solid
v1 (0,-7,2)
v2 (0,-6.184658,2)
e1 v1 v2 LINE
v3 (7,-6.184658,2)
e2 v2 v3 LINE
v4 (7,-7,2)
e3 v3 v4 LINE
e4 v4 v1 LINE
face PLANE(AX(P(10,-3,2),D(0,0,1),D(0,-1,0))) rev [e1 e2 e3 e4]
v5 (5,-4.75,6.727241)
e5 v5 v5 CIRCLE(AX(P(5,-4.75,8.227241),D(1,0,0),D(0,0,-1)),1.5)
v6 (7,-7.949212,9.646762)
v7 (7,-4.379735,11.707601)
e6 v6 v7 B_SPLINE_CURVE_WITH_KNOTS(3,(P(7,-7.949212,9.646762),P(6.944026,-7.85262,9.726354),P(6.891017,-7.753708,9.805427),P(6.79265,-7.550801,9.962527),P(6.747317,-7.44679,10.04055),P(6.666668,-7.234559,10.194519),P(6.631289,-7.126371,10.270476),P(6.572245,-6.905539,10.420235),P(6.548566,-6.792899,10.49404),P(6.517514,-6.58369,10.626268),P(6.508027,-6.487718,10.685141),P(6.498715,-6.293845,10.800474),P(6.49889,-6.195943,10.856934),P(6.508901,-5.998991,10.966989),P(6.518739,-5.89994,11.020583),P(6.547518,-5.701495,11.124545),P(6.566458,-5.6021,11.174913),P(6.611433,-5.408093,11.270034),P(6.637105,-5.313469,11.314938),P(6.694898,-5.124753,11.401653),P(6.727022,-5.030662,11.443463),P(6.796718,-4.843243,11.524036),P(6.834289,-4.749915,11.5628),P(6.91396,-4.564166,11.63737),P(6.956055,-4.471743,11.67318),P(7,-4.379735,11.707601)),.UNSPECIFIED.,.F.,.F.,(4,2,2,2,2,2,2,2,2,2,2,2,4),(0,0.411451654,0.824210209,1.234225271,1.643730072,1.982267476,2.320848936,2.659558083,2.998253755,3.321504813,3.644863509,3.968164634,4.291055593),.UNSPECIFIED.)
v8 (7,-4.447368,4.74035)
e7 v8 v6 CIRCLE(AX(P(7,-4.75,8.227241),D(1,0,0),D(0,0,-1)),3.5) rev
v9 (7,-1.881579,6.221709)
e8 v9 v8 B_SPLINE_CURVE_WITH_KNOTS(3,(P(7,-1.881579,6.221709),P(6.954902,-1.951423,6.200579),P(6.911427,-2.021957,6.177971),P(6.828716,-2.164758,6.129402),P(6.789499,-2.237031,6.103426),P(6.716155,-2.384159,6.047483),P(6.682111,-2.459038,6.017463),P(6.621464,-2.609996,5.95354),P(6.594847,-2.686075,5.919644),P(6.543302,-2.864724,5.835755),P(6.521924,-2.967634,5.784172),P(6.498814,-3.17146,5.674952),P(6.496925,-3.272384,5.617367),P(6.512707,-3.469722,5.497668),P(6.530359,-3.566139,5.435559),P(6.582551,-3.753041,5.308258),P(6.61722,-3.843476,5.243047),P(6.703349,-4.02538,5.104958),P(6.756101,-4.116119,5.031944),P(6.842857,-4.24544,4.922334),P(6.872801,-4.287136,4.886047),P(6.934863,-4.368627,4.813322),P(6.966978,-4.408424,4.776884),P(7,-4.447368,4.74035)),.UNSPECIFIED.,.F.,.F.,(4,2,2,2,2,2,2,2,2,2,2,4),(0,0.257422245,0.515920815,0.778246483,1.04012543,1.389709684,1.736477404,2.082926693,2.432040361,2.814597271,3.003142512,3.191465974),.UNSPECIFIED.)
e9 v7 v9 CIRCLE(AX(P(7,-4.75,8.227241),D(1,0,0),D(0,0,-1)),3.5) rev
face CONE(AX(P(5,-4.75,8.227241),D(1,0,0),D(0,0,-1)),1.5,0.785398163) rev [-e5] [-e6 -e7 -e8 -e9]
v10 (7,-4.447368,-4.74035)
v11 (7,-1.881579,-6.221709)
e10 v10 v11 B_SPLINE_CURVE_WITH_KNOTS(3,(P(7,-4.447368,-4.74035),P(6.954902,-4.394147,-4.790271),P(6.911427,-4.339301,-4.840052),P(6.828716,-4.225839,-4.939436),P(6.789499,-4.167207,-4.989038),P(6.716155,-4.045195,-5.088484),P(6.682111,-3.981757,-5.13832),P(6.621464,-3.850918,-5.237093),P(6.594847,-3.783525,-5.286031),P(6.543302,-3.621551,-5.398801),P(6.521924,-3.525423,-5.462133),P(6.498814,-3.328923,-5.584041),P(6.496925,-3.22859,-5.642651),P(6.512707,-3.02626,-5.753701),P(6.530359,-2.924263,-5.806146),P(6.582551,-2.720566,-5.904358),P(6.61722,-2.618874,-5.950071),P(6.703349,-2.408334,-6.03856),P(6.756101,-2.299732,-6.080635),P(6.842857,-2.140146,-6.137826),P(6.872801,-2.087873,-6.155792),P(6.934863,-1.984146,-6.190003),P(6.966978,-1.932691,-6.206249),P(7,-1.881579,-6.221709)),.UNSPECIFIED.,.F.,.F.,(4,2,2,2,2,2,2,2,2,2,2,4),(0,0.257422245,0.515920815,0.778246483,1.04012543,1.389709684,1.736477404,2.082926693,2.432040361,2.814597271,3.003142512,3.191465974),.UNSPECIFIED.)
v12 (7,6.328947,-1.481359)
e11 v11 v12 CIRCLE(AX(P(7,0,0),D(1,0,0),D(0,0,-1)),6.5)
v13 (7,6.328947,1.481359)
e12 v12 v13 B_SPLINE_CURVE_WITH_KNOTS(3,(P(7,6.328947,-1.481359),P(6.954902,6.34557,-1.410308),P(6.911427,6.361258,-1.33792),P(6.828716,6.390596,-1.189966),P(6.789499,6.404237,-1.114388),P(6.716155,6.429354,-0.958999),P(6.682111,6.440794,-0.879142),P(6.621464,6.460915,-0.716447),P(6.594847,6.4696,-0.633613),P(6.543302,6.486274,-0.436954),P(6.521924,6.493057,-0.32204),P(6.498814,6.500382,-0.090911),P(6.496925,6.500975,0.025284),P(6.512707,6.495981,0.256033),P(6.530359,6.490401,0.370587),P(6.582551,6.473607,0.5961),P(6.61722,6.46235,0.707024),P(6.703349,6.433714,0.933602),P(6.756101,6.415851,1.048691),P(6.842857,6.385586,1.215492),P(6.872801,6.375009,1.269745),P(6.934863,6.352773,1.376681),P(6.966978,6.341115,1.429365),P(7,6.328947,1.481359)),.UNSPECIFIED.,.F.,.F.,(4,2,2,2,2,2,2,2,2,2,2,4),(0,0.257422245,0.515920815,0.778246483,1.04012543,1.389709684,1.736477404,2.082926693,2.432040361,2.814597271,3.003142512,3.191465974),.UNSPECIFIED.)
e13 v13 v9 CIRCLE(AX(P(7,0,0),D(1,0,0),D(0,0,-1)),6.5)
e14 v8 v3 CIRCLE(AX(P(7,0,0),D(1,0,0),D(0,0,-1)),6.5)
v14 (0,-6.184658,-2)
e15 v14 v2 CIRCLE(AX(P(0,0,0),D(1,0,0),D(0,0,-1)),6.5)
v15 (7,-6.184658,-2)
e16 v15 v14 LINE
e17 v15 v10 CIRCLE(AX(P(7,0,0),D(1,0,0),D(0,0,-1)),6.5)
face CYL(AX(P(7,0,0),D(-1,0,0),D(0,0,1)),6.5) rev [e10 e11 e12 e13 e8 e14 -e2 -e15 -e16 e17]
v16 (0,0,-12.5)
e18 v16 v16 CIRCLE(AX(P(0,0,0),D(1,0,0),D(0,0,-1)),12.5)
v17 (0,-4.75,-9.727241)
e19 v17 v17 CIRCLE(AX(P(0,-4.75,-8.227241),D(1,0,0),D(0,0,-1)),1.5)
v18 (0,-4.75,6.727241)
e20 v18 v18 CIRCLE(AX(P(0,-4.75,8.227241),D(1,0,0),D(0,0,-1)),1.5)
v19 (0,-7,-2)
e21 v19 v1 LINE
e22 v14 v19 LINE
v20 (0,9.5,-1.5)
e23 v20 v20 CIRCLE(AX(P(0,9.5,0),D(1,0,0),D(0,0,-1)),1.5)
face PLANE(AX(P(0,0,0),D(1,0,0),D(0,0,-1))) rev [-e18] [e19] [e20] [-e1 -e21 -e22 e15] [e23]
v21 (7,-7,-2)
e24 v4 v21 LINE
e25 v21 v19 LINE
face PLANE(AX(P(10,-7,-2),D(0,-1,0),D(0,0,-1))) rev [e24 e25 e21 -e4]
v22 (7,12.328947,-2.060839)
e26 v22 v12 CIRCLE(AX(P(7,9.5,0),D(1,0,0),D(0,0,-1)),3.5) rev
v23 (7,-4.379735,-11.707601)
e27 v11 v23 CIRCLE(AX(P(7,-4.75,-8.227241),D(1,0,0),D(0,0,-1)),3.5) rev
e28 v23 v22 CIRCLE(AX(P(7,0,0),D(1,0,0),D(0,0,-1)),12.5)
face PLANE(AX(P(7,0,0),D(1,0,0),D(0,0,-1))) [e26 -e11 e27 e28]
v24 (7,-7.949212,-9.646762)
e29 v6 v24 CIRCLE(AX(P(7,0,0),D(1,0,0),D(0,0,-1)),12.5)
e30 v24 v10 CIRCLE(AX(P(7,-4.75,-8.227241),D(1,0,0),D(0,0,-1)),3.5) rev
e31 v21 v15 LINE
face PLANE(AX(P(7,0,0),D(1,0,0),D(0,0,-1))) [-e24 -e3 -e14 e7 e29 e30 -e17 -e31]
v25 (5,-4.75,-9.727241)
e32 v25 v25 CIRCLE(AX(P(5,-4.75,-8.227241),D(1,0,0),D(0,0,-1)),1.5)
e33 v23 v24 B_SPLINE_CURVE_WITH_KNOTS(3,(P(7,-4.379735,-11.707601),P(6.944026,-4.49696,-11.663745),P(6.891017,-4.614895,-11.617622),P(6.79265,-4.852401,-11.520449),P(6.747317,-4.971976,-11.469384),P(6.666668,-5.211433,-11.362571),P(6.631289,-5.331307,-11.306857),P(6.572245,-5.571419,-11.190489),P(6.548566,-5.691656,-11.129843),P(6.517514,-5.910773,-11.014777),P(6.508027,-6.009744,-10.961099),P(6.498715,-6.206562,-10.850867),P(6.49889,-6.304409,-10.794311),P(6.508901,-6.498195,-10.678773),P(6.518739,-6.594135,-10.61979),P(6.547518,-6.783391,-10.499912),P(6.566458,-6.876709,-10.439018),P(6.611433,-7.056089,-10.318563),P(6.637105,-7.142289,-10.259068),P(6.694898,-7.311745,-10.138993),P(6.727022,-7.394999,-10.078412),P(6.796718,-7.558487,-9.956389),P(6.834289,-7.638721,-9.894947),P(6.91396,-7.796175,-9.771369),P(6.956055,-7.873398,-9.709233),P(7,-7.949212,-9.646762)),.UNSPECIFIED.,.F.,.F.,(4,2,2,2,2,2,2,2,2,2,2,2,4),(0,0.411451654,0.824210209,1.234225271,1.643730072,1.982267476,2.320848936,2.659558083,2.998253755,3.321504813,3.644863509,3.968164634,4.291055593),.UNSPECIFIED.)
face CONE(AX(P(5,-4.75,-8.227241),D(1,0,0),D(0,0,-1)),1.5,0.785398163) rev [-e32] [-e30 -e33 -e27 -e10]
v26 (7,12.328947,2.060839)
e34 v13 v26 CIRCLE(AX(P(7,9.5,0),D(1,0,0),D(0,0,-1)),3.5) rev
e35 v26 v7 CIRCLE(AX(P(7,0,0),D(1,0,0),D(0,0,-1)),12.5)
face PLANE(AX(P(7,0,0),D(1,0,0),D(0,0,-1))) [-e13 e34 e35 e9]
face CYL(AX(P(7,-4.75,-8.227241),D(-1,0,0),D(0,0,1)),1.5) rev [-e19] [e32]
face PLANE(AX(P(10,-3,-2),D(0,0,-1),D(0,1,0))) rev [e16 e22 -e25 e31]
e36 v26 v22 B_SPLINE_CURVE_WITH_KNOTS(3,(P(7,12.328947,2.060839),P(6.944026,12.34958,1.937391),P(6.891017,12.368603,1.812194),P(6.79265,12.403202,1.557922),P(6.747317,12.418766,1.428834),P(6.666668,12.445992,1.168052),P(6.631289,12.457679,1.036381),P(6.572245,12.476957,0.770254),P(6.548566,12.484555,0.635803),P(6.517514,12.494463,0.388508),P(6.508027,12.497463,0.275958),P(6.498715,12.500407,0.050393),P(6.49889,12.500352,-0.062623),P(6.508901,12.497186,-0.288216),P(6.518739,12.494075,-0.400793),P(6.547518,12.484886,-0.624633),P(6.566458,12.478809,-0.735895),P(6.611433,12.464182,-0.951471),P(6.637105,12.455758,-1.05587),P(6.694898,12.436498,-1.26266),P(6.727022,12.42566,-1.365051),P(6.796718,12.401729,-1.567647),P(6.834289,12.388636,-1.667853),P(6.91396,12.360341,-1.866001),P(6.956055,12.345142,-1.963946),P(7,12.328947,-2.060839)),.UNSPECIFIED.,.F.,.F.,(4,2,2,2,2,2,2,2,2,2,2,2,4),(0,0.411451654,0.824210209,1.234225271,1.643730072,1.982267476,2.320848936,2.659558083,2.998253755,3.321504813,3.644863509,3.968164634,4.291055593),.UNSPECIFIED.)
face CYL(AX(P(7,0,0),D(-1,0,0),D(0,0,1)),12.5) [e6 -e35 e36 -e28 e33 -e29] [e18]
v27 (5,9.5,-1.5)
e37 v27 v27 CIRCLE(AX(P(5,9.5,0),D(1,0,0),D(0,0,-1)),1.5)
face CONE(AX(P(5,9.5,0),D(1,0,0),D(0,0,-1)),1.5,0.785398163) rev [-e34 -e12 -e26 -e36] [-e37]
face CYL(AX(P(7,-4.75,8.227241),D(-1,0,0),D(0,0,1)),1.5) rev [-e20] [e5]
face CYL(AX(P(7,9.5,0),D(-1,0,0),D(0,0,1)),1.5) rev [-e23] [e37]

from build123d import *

# Parameters (mm, degrees)
SKETCH1_R           = 12.5
SKETCH1_R_2         = 6.5
SKETCH1_R_3         = 1.5
BOSS_EXTRUDE1_DEPTH = 7
CHAMFER1_SIZE       = 2
SKETCH2_W           = 4
SKETCH2_H           = 4
CUT_EXTRUDE1_DEPTH  = 10


with BuildPart() as part:
    # Sketch1 → Boss-Extrude1 (new body)
    with BuildSketch(Plane(origin=(0, 0, 0), x_dir=(0, 0, -1), z_dir=(1, 0, 0))):
        Circle(SKETCH1_R)
        Circle(SKETCH1_R_2, mode=Mode.SUBTRACT)
        with Locations((0, 9.5)):
            Circle(SKETCH1_R_3, mode=Mode.SUBTRACT)
        with Locations((-8.227241336, -4.75)):
            Circle(SKETCH1_R_3, mode=Mode.SUBTRACT)
        with Locations((8.227241336, -4.75)):
            Circle(SKETCH1_R_3, mode=Mode.SUBTRACT)
    extrude(amount=BOSS_EXTRUDE1_DEPTH)

    # Chamfer1
    # the kernel refuses this chamfer: 2 mm, written as the material it takes off along each edge
    with BuildSketch(Plane(origin=(7, -4.75, 8.227241336), x_dir=(0, 0, -1), z_dir=(0, -1, 0))) as chamfer1_piece_1:
        Polygon((1.5, -CHAMFER1_SIZE), (1.5 + CHAMFER1_SIZE, 0), (1.5, 0), align=None)
    revolve(axis=Axis((7, -4.75, 8.227241336), (1, 0, 0)), mode=Mode.SUBTRACT)
    with BuildSketch(Plane(origin=(7, -4.75, -8.227241336), x_dir=(0, 0, -1), z_dir=(0, -1, 0))) as chamfer1_piece_2:
        Polygon((1.5, -CHAMFER1_SIZE), (1.5 + CHAMFER1_SIZE, 0), (1.5, 0), align=None)
    revolve(axis=Axis((7, -4.75, -8.227241336), (1, 0, 0)), mode=Mode.SUBTRACT)
    with BuildSketch(Plane(origin=(7, 9.5, 0), x_dir=(0, 0, -1), z_dir=(0, -1, 0))) as chamfer1_piece_3:
        Polygon((1.5, -CHAMFER1_SIZE), (1.5 + CHAMFER1_SIZE, 0), (1.5, 0), align=None)
    revolve(axis=Axis((7, 9.5, 0), (1, 0, 0)), mode=Mode.SUBTRACT)

    # Sketch2 → Cut-Extrude1 (cut)
    with BuildSketch(Plane.ZY):
        with Locations((0, -5)):
            Rectangle(SKETCH2_W, SKETCH2_H)
    extrude(amount=-CUT_EXTRUDE1_DEPTH, mode=Mode.SUBTRACT)


solid = part.part
